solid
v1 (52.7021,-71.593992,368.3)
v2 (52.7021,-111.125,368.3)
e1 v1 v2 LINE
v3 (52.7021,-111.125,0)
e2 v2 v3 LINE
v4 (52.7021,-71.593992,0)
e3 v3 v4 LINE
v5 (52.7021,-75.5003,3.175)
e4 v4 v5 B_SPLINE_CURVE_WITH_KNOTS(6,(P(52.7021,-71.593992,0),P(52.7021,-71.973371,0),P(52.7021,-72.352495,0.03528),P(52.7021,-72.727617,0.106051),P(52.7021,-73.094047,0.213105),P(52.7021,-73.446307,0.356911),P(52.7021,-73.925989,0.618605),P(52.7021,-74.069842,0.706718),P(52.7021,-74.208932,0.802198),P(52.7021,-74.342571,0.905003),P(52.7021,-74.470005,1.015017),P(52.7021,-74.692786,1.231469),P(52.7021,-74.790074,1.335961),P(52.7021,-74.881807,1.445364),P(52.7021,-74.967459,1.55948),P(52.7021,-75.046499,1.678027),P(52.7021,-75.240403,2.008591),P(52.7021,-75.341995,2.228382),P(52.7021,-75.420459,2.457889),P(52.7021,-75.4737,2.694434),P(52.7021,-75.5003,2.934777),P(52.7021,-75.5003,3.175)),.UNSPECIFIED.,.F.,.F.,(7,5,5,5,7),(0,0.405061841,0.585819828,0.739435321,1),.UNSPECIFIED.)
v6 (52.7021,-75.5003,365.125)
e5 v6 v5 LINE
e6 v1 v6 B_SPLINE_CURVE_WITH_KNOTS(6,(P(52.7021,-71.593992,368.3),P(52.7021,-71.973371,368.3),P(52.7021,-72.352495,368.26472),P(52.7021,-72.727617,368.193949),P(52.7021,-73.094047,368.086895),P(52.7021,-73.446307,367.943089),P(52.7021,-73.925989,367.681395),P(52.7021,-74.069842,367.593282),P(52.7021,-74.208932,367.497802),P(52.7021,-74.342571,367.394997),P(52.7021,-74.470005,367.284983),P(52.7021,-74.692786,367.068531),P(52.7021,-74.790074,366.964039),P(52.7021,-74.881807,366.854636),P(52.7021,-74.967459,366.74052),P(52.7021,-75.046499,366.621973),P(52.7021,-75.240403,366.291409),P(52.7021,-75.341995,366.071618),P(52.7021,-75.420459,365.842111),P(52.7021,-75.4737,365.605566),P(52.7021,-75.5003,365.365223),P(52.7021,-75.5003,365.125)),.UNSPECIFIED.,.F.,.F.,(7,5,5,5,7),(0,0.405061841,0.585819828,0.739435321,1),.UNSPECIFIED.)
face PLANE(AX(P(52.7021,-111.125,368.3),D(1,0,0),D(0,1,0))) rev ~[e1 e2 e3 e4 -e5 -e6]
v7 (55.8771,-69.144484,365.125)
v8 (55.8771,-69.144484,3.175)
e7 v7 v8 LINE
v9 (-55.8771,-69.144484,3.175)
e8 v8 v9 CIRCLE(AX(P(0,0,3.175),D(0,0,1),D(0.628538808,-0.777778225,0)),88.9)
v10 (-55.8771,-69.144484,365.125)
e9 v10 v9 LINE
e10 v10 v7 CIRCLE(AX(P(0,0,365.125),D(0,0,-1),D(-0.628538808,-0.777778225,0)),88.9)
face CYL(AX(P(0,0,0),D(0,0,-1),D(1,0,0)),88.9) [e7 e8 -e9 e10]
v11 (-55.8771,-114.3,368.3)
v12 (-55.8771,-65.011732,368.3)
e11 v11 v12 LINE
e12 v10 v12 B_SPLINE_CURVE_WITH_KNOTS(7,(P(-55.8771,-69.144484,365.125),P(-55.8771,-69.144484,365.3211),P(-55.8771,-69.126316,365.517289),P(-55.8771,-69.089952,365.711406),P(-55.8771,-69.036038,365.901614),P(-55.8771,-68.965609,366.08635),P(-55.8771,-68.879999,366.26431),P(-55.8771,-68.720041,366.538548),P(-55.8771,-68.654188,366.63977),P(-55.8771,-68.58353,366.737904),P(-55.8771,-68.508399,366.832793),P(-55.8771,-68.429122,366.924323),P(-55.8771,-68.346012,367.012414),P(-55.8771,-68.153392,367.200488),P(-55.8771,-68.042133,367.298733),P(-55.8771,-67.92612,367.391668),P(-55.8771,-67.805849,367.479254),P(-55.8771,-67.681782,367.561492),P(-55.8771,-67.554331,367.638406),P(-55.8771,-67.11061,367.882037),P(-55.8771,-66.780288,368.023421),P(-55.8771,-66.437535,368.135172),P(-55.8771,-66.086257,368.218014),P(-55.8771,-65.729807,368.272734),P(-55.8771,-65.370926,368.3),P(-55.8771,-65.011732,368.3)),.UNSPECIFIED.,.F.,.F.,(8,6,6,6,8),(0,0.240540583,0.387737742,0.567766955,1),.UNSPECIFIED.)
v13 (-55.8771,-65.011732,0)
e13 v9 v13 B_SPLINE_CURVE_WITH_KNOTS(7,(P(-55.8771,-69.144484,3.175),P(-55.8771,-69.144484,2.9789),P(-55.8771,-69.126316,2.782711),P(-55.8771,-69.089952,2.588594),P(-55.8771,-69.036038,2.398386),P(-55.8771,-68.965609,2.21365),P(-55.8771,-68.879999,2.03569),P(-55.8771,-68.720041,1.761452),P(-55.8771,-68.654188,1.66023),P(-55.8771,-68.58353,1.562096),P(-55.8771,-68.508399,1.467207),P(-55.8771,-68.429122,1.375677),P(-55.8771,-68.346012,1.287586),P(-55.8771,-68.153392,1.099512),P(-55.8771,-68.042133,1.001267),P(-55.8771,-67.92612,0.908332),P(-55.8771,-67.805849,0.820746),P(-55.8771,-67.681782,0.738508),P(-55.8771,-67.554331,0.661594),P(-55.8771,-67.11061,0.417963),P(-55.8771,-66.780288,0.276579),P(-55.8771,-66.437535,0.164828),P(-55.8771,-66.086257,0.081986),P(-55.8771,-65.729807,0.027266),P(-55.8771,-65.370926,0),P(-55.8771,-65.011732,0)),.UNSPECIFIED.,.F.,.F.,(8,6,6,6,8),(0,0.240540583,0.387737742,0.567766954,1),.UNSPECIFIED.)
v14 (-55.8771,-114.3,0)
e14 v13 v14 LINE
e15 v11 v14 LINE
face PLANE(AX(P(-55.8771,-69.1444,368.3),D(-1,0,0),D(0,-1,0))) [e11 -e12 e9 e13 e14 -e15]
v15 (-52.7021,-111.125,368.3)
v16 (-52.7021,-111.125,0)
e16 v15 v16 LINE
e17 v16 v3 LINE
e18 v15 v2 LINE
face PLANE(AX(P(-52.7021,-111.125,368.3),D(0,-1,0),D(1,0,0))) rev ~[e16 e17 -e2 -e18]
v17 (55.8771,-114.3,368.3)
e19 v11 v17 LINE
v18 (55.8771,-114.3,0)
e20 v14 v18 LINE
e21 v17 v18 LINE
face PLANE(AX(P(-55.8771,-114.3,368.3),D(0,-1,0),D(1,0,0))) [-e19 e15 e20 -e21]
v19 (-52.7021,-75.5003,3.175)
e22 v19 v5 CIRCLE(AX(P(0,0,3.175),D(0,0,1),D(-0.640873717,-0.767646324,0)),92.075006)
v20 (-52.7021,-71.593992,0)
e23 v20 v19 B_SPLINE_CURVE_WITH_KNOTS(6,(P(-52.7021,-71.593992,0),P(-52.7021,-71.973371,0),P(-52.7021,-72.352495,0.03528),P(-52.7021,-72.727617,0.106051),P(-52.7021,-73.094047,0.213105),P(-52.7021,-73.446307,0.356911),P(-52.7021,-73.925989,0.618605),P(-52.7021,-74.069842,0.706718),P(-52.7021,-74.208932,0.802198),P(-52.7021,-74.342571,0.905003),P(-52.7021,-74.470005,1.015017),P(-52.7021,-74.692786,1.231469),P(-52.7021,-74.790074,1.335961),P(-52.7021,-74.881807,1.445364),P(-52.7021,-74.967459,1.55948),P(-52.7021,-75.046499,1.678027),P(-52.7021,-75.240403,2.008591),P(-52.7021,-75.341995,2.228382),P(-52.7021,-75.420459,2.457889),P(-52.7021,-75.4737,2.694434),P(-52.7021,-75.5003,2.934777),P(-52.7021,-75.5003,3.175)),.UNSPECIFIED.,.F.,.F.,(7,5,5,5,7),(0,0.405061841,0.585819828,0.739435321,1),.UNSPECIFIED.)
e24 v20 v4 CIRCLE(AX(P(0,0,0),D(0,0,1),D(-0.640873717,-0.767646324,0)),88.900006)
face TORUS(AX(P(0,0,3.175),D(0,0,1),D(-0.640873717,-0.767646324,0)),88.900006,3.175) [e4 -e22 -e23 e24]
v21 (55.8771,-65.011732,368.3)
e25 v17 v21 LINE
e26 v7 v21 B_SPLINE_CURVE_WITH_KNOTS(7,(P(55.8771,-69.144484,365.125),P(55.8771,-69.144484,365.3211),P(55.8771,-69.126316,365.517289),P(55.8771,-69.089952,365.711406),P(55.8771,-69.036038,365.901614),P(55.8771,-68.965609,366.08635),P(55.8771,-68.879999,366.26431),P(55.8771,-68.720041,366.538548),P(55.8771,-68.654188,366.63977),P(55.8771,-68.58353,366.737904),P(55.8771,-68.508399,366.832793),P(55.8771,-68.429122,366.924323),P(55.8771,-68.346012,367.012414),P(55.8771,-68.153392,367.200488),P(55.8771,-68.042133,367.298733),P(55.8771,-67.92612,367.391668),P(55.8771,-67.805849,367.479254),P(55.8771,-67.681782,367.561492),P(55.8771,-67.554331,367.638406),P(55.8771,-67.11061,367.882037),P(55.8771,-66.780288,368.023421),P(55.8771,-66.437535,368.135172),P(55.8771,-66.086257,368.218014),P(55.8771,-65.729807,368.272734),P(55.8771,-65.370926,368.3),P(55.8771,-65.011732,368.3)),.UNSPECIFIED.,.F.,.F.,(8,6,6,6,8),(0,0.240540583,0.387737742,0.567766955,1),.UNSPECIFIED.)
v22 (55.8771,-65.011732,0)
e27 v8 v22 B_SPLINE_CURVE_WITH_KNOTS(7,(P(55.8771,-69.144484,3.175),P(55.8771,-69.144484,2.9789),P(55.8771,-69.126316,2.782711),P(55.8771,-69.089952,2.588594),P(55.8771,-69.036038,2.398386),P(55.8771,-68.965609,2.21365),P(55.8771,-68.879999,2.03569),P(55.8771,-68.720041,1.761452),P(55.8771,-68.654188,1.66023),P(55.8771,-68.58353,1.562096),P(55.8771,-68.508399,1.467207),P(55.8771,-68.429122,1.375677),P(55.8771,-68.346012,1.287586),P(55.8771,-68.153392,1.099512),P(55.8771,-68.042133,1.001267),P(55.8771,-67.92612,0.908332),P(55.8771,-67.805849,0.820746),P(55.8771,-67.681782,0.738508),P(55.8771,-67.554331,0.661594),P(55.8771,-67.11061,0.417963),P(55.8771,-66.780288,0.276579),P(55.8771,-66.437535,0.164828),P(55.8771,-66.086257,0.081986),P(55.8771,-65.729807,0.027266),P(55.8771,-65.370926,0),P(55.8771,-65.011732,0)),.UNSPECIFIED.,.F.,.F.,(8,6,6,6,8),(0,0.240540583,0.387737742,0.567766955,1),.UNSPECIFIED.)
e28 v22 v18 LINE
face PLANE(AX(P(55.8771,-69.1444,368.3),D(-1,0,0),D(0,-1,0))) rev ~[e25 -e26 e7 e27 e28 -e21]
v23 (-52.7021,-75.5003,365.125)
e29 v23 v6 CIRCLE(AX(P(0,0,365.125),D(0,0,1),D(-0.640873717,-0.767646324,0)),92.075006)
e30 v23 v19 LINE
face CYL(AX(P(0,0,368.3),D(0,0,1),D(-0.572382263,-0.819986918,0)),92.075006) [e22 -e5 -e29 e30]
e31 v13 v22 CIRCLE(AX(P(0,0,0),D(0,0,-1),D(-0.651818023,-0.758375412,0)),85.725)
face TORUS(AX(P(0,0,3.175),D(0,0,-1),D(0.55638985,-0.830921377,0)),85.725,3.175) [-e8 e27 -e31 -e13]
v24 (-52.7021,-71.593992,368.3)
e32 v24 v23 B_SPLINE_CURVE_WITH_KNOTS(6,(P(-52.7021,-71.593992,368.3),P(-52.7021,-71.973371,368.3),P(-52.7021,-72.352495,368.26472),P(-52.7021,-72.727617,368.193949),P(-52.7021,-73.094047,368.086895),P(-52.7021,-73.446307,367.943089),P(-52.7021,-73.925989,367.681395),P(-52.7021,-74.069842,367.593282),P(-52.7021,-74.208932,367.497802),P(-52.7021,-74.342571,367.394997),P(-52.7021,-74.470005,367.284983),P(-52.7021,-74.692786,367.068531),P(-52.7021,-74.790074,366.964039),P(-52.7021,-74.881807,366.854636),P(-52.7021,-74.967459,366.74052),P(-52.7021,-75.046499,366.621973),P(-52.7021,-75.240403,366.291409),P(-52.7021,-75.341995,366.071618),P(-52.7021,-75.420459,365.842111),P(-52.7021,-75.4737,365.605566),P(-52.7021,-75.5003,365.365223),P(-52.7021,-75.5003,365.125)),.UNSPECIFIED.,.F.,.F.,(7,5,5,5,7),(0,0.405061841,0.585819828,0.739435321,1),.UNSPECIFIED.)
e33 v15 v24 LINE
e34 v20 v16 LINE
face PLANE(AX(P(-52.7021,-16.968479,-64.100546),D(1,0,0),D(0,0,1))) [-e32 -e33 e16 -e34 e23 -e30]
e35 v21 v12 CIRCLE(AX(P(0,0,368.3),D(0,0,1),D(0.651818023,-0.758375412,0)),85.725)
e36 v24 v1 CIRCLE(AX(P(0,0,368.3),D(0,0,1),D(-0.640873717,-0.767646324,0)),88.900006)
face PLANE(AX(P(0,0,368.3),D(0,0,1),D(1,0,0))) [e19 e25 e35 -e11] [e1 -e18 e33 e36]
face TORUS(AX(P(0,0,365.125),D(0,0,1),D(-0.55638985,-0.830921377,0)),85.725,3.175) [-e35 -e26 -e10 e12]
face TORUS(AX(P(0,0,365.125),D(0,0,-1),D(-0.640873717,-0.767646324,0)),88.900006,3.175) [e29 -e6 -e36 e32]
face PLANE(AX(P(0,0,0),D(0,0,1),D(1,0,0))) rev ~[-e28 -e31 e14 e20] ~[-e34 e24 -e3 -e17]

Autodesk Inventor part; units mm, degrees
ref_plane "YZ Plane" through (0, 0, 0) normal (1, 0, 0) x (0, 1, 0)
ref_plane "XZ Plane" through (0, 0, 0) normal (0, 1, 0) x (-1, 0, 0)
ref_plane "XY Plane" through (0, 0, 0) normal (0, 0, 1) x (1, 0, 0)
sketch "Sketch6" plane through (0, 0, 0) normal (0, 0, 1) x (1, 0, 0)
  circle A0 centre (0, 0) radius 88.9
  dimension "d25" = 177.8
extrude "Extrusion6" add sketch "Sketch6" along normal blind 368.3
sketch "Sketch7" plane through (0, 0, 368.3) normal (0, 0, 1) x (1, 0, 0)
  circle A0 centre (0, 0) radius 88.9 projected
  line L0 (55.8771, -69.1444) -> (55.8771, -114.3)
  line L1 (-55.8771, -69.1444) -> (-55.8771, -114.3)
  line L2 (-55.8771, -114.3) -> (55.8771, -114.3)
  arc A1 (-55.8771, -69.1444) -> (55.8771, -69.1444) centre (0, 0) ccw
  line L3 (52.7021, -111.125) -> (52.7021, -75.5003)
  arc A2 (-52.7021, -75.5003) -> (52.7021, -75.5003) centre (0, 0) ccw
  line L4 (-52.7021, -75.5003) -> (-52.7021, -111.125)
  line L5 (-52.7021, -111.125) -> (52.7021, -111.125)
  dimension "d29" = 3.175
extrude "Extrusion7" add sketch "Sketch7" against normal blind 368.3 contours A0 L0 L2 L1
fillet "Fillet1" radius 3.175 4 edges at (0, 88.9, 368.3) (0, 88.9, 0) (0, -92.075, 368.3) (0, -92.075, 0)
properties part number "Tank"
